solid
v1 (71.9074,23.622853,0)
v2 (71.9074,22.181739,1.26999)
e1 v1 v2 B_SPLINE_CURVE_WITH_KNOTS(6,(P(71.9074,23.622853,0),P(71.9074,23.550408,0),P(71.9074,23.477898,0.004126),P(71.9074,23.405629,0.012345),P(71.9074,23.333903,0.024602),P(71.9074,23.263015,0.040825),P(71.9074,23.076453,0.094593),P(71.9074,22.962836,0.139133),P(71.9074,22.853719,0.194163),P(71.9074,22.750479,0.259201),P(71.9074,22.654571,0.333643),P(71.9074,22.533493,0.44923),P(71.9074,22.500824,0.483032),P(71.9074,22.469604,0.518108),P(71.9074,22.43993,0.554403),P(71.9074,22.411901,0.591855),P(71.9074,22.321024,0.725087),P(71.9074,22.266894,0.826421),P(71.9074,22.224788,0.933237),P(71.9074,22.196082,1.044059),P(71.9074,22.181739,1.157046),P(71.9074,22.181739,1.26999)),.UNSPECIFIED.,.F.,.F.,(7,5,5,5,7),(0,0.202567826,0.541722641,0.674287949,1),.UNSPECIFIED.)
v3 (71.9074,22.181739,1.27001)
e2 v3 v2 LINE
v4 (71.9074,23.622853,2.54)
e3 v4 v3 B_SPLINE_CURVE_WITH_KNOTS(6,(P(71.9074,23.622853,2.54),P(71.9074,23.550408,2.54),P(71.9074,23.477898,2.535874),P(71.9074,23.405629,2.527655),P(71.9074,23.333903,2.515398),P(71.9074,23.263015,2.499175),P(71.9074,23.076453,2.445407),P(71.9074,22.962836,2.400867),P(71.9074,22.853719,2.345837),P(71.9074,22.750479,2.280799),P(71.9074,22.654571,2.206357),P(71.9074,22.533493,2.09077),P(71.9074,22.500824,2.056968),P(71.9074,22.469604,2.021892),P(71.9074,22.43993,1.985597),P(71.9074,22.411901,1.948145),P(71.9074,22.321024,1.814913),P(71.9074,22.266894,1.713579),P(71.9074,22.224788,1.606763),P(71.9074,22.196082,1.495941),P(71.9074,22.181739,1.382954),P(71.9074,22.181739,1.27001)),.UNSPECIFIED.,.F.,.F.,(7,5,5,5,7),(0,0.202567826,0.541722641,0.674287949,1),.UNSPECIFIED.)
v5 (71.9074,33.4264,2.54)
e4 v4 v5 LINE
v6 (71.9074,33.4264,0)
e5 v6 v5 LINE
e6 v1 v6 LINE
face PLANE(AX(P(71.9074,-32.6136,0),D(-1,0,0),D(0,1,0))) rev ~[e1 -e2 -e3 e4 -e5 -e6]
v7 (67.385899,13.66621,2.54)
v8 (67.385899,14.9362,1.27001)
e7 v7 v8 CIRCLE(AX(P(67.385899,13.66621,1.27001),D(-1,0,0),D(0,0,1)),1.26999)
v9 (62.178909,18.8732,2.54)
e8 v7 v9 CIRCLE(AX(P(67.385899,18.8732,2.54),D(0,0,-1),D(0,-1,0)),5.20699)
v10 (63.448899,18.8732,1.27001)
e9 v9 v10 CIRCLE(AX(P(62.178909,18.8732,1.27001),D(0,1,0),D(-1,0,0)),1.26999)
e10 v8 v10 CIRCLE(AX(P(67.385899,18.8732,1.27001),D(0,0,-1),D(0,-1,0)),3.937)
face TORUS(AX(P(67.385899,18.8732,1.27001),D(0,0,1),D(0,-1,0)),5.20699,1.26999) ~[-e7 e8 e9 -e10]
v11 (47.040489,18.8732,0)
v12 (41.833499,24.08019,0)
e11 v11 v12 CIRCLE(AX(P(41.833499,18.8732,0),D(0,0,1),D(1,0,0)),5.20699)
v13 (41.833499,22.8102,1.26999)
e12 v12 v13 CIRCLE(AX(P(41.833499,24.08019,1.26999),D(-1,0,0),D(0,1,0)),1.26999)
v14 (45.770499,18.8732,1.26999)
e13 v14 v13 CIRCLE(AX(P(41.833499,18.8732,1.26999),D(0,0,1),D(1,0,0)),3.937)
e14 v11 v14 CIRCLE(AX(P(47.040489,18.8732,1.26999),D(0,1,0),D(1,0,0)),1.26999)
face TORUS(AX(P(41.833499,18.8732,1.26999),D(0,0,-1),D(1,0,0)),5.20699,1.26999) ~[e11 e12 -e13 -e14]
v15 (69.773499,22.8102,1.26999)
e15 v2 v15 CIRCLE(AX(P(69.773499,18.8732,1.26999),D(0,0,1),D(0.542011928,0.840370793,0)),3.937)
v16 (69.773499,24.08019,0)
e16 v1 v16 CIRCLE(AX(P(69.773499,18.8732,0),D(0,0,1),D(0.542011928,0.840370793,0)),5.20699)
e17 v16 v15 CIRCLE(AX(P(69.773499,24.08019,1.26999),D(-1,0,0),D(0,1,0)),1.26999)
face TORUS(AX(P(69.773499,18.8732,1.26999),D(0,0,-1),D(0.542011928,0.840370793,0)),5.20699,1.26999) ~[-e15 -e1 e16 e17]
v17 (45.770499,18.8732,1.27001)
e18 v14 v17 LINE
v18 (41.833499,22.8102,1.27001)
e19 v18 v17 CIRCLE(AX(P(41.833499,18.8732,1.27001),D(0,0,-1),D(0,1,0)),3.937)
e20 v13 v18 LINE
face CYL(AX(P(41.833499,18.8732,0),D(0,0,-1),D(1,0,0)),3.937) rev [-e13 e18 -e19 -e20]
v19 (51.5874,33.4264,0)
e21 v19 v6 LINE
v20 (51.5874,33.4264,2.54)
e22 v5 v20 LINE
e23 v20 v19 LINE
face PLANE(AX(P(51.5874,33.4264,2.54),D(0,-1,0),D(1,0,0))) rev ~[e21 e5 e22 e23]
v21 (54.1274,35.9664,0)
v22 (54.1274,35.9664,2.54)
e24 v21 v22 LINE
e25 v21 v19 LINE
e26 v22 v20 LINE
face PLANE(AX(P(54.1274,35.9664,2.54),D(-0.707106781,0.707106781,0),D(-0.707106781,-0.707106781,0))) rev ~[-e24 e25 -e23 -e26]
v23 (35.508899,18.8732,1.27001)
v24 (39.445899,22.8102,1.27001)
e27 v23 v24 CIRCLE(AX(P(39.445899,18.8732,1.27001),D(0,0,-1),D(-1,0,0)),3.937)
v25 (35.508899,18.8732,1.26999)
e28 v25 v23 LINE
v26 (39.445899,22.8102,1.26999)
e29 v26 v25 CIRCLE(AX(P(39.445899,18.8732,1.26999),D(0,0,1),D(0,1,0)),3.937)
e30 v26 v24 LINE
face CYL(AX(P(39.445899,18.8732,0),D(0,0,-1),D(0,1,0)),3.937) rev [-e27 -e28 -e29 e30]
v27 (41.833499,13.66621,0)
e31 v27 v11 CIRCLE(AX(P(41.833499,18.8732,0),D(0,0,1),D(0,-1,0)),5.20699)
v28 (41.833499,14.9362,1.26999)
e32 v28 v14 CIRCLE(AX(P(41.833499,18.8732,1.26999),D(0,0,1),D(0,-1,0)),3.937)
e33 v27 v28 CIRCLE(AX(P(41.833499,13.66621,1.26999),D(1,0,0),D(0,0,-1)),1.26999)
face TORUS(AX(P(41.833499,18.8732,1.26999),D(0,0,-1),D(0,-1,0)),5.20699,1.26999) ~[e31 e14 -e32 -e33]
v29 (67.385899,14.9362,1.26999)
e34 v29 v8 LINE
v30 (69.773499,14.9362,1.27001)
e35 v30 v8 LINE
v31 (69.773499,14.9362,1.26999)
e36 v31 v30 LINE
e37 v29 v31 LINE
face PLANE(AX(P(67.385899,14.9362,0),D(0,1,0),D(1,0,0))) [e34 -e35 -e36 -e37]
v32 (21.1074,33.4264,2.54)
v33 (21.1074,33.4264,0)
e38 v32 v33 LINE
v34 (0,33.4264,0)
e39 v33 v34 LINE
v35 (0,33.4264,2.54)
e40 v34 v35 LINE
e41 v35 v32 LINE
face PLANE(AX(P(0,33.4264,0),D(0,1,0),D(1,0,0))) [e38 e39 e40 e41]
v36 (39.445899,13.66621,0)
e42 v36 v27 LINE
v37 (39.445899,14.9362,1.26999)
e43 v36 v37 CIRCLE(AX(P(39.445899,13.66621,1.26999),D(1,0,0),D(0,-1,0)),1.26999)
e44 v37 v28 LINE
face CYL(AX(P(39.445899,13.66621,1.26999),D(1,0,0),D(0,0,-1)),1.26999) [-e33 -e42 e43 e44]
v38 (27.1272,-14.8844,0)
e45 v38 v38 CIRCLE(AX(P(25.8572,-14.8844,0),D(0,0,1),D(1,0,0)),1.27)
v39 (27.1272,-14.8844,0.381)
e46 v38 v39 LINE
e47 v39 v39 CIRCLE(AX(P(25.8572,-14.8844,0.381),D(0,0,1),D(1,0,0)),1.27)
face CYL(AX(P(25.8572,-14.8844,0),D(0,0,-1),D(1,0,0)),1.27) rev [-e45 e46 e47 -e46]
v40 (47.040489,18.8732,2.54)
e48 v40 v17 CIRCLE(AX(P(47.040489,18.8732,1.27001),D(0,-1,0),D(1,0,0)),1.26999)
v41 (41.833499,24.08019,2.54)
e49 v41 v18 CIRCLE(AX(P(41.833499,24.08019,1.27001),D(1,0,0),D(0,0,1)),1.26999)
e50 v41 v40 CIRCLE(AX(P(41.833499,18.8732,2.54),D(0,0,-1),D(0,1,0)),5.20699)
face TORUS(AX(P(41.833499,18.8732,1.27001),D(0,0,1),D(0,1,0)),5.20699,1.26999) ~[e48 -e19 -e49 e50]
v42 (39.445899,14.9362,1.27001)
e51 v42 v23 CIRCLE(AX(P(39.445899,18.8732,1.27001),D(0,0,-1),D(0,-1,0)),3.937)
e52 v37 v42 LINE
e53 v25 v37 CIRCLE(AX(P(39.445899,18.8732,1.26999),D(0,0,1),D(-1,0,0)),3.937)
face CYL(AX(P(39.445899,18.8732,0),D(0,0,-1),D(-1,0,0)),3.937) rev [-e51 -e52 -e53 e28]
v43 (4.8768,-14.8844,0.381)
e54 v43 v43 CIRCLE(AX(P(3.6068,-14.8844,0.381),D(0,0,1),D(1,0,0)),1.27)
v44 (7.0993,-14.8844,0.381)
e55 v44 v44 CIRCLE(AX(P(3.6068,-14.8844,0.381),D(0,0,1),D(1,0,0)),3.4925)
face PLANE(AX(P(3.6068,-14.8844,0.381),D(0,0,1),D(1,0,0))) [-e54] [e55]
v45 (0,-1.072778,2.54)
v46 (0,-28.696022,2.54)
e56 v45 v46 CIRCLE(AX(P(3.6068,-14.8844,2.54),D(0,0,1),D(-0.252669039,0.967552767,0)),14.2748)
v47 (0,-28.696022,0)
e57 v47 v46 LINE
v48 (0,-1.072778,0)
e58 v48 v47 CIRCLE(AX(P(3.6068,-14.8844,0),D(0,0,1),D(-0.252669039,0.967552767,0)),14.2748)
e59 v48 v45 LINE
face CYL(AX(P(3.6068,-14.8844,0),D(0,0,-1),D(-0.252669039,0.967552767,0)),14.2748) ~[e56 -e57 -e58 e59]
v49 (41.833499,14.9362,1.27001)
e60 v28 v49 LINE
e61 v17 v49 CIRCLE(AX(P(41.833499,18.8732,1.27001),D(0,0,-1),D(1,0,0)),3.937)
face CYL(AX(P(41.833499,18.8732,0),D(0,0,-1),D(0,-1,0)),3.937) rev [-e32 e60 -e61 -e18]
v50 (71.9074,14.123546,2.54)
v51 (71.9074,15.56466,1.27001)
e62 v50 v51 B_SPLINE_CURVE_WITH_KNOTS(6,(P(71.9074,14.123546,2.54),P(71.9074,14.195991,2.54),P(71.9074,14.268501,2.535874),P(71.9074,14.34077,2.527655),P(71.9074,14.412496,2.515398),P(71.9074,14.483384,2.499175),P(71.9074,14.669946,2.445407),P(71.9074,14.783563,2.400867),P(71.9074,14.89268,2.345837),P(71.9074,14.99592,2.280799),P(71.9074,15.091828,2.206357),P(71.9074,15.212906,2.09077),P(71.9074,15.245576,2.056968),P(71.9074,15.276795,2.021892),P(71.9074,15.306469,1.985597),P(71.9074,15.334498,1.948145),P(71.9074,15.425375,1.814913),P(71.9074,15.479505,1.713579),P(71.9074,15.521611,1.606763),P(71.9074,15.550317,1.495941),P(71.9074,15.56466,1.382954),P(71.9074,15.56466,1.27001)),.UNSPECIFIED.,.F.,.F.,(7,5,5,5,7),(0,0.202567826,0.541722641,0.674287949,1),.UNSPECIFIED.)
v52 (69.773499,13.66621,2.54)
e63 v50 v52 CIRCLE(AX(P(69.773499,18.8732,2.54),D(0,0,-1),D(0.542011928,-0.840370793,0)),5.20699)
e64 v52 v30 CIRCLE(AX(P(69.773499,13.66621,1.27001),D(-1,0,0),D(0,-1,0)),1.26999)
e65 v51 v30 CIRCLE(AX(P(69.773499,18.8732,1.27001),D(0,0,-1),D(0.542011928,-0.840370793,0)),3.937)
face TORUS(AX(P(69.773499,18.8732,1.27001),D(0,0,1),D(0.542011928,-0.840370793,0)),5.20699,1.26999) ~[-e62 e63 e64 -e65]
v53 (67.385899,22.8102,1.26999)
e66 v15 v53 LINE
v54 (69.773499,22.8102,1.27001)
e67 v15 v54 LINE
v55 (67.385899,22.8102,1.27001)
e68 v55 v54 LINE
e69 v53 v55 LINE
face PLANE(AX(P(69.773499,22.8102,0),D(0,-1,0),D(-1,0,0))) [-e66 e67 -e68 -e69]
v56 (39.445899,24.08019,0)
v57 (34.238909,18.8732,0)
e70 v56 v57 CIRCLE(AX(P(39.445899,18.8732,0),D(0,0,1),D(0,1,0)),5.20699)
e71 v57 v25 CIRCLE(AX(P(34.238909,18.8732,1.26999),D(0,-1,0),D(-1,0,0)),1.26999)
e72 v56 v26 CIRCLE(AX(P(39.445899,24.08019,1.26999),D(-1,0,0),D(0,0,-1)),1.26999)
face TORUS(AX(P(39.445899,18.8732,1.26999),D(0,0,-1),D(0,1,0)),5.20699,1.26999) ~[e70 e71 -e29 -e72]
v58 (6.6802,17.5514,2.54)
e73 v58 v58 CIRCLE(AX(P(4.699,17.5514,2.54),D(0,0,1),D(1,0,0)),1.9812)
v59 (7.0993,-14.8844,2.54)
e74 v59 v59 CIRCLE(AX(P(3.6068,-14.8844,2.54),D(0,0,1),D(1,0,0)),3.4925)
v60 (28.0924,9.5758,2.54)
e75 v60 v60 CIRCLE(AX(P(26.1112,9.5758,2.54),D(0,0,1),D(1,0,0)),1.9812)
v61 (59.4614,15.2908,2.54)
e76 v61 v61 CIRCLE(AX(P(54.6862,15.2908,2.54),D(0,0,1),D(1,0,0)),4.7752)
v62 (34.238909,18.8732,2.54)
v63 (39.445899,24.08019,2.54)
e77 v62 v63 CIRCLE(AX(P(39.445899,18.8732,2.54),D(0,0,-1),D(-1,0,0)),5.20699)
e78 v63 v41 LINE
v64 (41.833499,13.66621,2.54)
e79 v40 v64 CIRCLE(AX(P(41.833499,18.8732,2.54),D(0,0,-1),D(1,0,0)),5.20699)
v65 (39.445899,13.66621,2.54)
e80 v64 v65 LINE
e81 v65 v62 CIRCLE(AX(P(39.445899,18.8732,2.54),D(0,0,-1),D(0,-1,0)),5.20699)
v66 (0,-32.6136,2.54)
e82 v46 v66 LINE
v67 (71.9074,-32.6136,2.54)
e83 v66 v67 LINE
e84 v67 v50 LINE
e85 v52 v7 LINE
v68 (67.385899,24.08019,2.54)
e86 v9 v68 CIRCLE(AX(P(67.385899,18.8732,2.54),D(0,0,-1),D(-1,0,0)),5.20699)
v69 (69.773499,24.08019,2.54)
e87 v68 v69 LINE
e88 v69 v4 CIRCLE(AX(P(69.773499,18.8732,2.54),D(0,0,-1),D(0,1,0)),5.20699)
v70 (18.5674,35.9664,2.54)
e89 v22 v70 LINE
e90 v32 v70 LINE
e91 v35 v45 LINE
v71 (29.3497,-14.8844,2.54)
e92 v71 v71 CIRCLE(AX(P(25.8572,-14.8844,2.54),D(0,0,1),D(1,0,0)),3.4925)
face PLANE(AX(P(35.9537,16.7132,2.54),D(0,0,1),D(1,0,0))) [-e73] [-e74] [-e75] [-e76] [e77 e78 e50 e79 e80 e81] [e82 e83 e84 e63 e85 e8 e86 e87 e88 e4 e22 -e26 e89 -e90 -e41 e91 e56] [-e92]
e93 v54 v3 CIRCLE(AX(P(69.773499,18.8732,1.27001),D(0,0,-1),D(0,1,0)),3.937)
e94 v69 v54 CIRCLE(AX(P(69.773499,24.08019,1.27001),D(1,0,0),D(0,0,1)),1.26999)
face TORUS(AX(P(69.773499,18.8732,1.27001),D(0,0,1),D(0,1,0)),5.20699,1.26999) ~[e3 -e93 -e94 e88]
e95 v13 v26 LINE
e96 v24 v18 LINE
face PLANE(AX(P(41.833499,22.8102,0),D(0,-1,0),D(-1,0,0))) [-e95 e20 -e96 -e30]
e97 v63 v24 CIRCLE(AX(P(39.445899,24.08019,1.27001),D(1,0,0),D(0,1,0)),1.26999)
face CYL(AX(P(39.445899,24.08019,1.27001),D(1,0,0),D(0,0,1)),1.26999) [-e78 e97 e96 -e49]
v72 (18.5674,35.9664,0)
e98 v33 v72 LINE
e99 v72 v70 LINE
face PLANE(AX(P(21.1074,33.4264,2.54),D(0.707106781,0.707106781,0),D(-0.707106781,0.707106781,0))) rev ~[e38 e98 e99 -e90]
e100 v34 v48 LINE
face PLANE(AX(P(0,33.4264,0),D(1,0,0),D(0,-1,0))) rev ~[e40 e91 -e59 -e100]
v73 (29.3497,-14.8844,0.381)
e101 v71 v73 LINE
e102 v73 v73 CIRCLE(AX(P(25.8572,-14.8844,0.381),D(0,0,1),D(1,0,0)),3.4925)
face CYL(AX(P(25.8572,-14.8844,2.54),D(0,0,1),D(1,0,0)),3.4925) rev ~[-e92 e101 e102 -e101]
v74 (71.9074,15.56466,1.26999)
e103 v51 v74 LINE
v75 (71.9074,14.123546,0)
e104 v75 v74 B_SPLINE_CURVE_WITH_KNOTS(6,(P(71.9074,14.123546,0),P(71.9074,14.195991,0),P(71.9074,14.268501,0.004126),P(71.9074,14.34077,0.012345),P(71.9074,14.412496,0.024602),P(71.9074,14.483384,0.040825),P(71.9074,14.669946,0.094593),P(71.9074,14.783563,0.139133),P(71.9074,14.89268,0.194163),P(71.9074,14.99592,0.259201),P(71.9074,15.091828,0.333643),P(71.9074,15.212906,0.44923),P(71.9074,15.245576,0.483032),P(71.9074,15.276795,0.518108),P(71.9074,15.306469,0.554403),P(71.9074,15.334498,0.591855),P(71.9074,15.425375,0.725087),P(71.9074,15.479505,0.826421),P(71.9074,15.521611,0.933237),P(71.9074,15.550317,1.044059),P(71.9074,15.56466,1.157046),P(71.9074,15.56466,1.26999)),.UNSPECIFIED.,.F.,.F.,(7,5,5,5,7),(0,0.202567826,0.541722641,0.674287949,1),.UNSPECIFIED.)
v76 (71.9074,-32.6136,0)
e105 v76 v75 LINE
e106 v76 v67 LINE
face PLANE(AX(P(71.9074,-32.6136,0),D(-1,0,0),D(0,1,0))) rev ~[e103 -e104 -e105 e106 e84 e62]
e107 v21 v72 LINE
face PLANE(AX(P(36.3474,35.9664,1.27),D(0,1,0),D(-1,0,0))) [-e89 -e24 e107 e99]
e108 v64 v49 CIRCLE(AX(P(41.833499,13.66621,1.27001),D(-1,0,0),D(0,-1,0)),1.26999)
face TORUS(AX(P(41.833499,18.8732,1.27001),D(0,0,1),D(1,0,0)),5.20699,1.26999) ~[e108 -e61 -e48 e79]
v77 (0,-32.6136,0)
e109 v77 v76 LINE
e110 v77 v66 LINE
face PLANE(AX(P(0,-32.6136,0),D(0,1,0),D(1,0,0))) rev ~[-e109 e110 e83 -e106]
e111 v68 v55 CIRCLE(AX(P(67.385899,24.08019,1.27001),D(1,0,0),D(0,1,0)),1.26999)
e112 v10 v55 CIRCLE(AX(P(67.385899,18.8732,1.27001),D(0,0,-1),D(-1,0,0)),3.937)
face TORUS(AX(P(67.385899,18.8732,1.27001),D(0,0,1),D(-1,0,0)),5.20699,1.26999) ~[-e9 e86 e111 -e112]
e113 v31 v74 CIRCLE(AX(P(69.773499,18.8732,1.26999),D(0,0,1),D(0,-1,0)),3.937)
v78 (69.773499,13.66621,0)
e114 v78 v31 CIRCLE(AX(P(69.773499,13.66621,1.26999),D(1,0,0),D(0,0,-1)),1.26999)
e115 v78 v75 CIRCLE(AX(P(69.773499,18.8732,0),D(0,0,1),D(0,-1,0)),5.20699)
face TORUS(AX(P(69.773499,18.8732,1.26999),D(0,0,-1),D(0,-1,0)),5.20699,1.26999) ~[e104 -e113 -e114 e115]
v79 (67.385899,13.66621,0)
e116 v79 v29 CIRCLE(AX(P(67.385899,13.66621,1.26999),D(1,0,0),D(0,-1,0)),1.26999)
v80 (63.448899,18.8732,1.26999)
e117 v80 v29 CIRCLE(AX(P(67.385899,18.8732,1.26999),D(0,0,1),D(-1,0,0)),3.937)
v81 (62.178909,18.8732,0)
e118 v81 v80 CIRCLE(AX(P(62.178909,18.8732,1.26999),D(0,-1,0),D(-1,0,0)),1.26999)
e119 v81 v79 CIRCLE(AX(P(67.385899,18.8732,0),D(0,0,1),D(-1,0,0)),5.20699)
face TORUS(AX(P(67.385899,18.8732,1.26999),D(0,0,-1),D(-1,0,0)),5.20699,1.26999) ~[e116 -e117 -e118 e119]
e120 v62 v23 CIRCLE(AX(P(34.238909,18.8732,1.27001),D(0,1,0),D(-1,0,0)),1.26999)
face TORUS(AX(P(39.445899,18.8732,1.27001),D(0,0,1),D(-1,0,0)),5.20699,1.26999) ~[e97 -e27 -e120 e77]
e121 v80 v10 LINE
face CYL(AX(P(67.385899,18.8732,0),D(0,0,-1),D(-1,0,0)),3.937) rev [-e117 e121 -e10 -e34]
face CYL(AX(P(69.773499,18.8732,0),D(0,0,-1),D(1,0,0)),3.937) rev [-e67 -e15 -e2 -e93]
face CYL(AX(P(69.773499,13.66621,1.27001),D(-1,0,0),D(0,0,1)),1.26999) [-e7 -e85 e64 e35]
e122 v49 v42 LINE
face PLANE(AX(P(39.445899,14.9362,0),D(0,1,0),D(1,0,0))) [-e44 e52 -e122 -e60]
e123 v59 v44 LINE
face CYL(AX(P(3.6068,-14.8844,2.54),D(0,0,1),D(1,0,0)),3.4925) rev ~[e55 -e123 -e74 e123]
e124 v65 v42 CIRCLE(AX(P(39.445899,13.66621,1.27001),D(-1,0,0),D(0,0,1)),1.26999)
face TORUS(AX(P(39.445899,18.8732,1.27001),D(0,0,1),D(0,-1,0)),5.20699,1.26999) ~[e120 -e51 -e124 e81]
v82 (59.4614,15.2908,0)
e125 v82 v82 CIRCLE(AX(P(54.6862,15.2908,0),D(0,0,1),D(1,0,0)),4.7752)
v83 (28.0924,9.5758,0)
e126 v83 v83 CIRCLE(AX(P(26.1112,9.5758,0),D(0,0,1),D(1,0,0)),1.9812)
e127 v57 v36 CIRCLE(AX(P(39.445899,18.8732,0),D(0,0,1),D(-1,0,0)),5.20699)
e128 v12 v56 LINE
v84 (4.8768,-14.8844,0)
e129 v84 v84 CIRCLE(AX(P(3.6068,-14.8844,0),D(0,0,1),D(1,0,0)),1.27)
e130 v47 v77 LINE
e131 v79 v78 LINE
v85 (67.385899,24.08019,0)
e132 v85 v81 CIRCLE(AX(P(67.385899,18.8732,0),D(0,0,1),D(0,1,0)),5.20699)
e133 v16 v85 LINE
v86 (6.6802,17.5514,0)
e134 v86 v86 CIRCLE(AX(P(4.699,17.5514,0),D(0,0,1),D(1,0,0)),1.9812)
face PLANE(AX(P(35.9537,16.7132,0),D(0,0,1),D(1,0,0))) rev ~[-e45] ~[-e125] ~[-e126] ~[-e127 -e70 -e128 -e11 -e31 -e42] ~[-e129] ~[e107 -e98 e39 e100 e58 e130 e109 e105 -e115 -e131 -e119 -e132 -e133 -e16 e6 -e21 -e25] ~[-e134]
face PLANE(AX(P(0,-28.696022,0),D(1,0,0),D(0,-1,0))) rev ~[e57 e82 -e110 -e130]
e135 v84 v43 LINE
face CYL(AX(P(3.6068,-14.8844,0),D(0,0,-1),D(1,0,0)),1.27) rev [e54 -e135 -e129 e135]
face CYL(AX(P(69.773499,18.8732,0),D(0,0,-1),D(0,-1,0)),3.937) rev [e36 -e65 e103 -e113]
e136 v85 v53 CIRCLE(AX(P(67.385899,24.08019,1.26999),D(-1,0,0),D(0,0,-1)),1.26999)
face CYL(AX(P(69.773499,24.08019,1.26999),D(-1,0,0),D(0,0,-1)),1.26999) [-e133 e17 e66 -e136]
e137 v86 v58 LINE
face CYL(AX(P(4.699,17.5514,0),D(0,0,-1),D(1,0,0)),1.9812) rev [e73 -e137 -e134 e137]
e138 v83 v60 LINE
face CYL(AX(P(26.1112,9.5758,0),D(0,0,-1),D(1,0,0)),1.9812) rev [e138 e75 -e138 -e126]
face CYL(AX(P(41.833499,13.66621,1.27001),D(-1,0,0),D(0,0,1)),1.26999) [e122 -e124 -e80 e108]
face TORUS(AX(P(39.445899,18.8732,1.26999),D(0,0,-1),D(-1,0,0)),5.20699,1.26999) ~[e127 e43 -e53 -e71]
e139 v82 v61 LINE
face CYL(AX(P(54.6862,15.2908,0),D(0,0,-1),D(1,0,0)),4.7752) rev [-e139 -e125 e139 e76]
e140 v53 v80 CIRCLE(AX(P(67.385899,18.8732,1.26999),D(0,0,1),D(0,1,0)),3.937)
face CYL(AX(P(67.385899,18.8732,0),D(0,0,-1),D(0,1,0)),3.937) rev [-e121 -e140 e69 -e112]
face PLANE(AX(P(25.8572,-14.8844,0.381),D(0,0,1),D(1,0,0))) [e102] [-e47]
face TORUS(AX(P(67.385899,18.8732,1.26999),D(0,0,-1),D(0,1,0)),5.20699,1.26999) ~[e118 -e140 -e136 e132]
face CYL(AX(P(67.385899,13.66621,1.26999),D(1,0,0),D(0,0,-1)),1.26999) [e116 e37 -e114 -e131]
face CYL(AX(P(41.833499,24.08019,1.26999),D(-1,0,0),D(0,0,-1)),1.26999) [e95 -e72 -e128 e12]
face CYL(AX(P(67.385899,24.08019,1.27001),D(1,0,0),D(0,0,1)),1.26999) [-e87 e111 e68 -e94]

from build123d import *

# Parameters (mm, degrees)
F0_W     = 71.9074
F0_H     = 33.4264
F0_R     = 1.9812
F0_R_2   = 4.7752
F0_R_3   = 1.27
F1_DEPTH = 2.54
F3_DEPTH = 25.4
F4_W     = 35.56
F4_H     = 2.54
F5_DEPTH = 2.54
F7_DEPTH = 2.54
F8_R     = 3.4925
F8_R_2   = 1.27
F9_DEPTH = 2.159
F10_R    = 1.26999


# Not quite as in the source:
# - a fillet or chamfer is up to 0.001 mm smaller than in the source, because OpenCascade refuses the exact size


with BuildPart() as f1:
    # F0 (on Top) → F1 (new body)
    with BuildSketch(Plane.XY):
        with Locations((35.9537, 16.7132)):
            Rectangle(F0_W, F0_H)
        with Locations((26.1112, 9.5758)):
            Circle(F0_R, mode=Mode.SUBTRACT)
        with Locations((4.699, 17.5514)):
            Circle(F0_R, mode=Mode.SUBTRACT)
        with Locations((54.6862, 15.2908)):
            Circle(F0_R_2, mode=Mode.SUBTRACT)
        Polygon((71.9074, 0), (0, 0), (0, -1.0727777636), (0, -28.6960222364), (0, -32.6136), (71.9074, -32.6136), align=None)
        with Locations((3.6068, -14.8844)):
            Circle(F0_R_3, mode=Mode.SUBTRACT)
        with Locations((25.8572, -14.8844)):
            Circle(F0_R_3, mode=Mode.SUBTRACT)
        with BuildLine():
            Line((0, -28.6960222364), (0, -1.0727777636))
            ThreePointArc((0, -1.0727777636), (-10.668, -14.8844), (0, -28.6960222364))
        make_face()
    extrude(amount=F1_DEPTH)

    # F2 (on face) → F3 (cut)
    with BuildSketch(Plane.XY):
        with BuildLine():
            ThreePointArc((73.7104990378, 18.8731995366), (72.5573784353, 21.6570789342), (69.7734990378, 22.8101995366))
            Line((69.7734990378, 22.8101995366), (67.3858990378, 22.8101995366))
            ThreePointArc((67.3858990378, 22.8101995366), (64.6020196402, 21.6570789342), (63.4488990378, 18.8731995366))
            ThreePointArc((63.4488990378, 18.8731995366), (64.6020196402, 16.0893201391), (67.3858990378, 14.9361995366))
            Line((67.3858990378, 14.9361995366), (69.7734990378, 14.9361995366))
            ThreePointArc((69.7734990378, 14.9361995366), (72.5573784353, 16.0893201391), (73.7104990378, 18.8731995366))
        make_face()
        with BuildLine():
            ThreePointArc((45.7704990378, 18.8731995366), (44.6173784353, 21.6570789342), (41.8334990378, 22.8101995366))
            Line((41.8334990378, 22.8101995366), (39.4458990378, 22.8101995366))
            ThreePointArc((39.4458990378, 22.8101995366), (36.6620196402, 21.6570789342), (35.5088990378, 18.8731995366))
            ThreePointArc((35.5088990378, 18.8731995366), (36.6620196402, 16.0893201391), (39.4458990378, 14.9361995366))
            Line((39.4458990378, 14.9361995366), (41.8334990378, 14.9361995366))
            ThreePointArc((41.8334990378, 14.9361995366), (44.6173784353, 16.0893201391), (45.7704990378, 18.8731995366))
        make_face()
    extrude(amount=F3_DEPTH, mode=Mode.SUBTRACT)

    # F4 (on face) → F5 (join)
    with BuildSketch(Plane(origin=(0, 33.4264, 0), x_dir=(-1, 0, 0), z_dir=(0, 1, 0))):
        with Locations((-36.3474, 1.27)):
            Rectangle(F4_W, F4_H)
    extrude(amount=F5_DEPTH)

    # F6 (on face) → F7 (cut)
    with BuildSketch(Plane.XY.offset(2.54)):
        Polygon((18.5674, 33.4264), (21.1074, 33.4264), (18.5674, 35.9664), align=None)
        Polygon((54.1274, 33.4264), (54.1274, 35.9664), (51.5874, 33.4264), align=None)
    extrude(amount=-F7_DEPTH, mode=Mode.SUBTRACT)

    # F8 (on face) → F9 (cut)
    with BuildSketch(Plane.XY.offset(2.54)):
        with Locations((3.6068, -14.8844)):
            Circle(F8_R)
        with Locations((3.6068, -14.8844)):
            Circle(F8_R_2, mode=Mode.SUBTRACT)
        with Locations((25.8572, -14.8844)):
            Circle(F8_R)
        with Locations((25.8572, -14.8844)):
            Circle(F8_R_2, mode=Mode.SUBTRACT)
    extrude(amount=-F9_DEPTH, mode=Mode.SUBTRACT)

    # F10 (radius 1.27 in the source; OpenCascade refuses exactly that, so slightly less here)
    f10_edges = [f1.edges().sort_by_distance(p)[0] for p in [
        (35.508899, 18.8732, 2.54),
        (63.448899, 18.8732, 2.54),
        (63.448899, 18.8732, 0),
        (45.770499, 18.8732, 0),
    ]]
    fillet(f10_edges, radius=F10_R)


solid = f1.part
